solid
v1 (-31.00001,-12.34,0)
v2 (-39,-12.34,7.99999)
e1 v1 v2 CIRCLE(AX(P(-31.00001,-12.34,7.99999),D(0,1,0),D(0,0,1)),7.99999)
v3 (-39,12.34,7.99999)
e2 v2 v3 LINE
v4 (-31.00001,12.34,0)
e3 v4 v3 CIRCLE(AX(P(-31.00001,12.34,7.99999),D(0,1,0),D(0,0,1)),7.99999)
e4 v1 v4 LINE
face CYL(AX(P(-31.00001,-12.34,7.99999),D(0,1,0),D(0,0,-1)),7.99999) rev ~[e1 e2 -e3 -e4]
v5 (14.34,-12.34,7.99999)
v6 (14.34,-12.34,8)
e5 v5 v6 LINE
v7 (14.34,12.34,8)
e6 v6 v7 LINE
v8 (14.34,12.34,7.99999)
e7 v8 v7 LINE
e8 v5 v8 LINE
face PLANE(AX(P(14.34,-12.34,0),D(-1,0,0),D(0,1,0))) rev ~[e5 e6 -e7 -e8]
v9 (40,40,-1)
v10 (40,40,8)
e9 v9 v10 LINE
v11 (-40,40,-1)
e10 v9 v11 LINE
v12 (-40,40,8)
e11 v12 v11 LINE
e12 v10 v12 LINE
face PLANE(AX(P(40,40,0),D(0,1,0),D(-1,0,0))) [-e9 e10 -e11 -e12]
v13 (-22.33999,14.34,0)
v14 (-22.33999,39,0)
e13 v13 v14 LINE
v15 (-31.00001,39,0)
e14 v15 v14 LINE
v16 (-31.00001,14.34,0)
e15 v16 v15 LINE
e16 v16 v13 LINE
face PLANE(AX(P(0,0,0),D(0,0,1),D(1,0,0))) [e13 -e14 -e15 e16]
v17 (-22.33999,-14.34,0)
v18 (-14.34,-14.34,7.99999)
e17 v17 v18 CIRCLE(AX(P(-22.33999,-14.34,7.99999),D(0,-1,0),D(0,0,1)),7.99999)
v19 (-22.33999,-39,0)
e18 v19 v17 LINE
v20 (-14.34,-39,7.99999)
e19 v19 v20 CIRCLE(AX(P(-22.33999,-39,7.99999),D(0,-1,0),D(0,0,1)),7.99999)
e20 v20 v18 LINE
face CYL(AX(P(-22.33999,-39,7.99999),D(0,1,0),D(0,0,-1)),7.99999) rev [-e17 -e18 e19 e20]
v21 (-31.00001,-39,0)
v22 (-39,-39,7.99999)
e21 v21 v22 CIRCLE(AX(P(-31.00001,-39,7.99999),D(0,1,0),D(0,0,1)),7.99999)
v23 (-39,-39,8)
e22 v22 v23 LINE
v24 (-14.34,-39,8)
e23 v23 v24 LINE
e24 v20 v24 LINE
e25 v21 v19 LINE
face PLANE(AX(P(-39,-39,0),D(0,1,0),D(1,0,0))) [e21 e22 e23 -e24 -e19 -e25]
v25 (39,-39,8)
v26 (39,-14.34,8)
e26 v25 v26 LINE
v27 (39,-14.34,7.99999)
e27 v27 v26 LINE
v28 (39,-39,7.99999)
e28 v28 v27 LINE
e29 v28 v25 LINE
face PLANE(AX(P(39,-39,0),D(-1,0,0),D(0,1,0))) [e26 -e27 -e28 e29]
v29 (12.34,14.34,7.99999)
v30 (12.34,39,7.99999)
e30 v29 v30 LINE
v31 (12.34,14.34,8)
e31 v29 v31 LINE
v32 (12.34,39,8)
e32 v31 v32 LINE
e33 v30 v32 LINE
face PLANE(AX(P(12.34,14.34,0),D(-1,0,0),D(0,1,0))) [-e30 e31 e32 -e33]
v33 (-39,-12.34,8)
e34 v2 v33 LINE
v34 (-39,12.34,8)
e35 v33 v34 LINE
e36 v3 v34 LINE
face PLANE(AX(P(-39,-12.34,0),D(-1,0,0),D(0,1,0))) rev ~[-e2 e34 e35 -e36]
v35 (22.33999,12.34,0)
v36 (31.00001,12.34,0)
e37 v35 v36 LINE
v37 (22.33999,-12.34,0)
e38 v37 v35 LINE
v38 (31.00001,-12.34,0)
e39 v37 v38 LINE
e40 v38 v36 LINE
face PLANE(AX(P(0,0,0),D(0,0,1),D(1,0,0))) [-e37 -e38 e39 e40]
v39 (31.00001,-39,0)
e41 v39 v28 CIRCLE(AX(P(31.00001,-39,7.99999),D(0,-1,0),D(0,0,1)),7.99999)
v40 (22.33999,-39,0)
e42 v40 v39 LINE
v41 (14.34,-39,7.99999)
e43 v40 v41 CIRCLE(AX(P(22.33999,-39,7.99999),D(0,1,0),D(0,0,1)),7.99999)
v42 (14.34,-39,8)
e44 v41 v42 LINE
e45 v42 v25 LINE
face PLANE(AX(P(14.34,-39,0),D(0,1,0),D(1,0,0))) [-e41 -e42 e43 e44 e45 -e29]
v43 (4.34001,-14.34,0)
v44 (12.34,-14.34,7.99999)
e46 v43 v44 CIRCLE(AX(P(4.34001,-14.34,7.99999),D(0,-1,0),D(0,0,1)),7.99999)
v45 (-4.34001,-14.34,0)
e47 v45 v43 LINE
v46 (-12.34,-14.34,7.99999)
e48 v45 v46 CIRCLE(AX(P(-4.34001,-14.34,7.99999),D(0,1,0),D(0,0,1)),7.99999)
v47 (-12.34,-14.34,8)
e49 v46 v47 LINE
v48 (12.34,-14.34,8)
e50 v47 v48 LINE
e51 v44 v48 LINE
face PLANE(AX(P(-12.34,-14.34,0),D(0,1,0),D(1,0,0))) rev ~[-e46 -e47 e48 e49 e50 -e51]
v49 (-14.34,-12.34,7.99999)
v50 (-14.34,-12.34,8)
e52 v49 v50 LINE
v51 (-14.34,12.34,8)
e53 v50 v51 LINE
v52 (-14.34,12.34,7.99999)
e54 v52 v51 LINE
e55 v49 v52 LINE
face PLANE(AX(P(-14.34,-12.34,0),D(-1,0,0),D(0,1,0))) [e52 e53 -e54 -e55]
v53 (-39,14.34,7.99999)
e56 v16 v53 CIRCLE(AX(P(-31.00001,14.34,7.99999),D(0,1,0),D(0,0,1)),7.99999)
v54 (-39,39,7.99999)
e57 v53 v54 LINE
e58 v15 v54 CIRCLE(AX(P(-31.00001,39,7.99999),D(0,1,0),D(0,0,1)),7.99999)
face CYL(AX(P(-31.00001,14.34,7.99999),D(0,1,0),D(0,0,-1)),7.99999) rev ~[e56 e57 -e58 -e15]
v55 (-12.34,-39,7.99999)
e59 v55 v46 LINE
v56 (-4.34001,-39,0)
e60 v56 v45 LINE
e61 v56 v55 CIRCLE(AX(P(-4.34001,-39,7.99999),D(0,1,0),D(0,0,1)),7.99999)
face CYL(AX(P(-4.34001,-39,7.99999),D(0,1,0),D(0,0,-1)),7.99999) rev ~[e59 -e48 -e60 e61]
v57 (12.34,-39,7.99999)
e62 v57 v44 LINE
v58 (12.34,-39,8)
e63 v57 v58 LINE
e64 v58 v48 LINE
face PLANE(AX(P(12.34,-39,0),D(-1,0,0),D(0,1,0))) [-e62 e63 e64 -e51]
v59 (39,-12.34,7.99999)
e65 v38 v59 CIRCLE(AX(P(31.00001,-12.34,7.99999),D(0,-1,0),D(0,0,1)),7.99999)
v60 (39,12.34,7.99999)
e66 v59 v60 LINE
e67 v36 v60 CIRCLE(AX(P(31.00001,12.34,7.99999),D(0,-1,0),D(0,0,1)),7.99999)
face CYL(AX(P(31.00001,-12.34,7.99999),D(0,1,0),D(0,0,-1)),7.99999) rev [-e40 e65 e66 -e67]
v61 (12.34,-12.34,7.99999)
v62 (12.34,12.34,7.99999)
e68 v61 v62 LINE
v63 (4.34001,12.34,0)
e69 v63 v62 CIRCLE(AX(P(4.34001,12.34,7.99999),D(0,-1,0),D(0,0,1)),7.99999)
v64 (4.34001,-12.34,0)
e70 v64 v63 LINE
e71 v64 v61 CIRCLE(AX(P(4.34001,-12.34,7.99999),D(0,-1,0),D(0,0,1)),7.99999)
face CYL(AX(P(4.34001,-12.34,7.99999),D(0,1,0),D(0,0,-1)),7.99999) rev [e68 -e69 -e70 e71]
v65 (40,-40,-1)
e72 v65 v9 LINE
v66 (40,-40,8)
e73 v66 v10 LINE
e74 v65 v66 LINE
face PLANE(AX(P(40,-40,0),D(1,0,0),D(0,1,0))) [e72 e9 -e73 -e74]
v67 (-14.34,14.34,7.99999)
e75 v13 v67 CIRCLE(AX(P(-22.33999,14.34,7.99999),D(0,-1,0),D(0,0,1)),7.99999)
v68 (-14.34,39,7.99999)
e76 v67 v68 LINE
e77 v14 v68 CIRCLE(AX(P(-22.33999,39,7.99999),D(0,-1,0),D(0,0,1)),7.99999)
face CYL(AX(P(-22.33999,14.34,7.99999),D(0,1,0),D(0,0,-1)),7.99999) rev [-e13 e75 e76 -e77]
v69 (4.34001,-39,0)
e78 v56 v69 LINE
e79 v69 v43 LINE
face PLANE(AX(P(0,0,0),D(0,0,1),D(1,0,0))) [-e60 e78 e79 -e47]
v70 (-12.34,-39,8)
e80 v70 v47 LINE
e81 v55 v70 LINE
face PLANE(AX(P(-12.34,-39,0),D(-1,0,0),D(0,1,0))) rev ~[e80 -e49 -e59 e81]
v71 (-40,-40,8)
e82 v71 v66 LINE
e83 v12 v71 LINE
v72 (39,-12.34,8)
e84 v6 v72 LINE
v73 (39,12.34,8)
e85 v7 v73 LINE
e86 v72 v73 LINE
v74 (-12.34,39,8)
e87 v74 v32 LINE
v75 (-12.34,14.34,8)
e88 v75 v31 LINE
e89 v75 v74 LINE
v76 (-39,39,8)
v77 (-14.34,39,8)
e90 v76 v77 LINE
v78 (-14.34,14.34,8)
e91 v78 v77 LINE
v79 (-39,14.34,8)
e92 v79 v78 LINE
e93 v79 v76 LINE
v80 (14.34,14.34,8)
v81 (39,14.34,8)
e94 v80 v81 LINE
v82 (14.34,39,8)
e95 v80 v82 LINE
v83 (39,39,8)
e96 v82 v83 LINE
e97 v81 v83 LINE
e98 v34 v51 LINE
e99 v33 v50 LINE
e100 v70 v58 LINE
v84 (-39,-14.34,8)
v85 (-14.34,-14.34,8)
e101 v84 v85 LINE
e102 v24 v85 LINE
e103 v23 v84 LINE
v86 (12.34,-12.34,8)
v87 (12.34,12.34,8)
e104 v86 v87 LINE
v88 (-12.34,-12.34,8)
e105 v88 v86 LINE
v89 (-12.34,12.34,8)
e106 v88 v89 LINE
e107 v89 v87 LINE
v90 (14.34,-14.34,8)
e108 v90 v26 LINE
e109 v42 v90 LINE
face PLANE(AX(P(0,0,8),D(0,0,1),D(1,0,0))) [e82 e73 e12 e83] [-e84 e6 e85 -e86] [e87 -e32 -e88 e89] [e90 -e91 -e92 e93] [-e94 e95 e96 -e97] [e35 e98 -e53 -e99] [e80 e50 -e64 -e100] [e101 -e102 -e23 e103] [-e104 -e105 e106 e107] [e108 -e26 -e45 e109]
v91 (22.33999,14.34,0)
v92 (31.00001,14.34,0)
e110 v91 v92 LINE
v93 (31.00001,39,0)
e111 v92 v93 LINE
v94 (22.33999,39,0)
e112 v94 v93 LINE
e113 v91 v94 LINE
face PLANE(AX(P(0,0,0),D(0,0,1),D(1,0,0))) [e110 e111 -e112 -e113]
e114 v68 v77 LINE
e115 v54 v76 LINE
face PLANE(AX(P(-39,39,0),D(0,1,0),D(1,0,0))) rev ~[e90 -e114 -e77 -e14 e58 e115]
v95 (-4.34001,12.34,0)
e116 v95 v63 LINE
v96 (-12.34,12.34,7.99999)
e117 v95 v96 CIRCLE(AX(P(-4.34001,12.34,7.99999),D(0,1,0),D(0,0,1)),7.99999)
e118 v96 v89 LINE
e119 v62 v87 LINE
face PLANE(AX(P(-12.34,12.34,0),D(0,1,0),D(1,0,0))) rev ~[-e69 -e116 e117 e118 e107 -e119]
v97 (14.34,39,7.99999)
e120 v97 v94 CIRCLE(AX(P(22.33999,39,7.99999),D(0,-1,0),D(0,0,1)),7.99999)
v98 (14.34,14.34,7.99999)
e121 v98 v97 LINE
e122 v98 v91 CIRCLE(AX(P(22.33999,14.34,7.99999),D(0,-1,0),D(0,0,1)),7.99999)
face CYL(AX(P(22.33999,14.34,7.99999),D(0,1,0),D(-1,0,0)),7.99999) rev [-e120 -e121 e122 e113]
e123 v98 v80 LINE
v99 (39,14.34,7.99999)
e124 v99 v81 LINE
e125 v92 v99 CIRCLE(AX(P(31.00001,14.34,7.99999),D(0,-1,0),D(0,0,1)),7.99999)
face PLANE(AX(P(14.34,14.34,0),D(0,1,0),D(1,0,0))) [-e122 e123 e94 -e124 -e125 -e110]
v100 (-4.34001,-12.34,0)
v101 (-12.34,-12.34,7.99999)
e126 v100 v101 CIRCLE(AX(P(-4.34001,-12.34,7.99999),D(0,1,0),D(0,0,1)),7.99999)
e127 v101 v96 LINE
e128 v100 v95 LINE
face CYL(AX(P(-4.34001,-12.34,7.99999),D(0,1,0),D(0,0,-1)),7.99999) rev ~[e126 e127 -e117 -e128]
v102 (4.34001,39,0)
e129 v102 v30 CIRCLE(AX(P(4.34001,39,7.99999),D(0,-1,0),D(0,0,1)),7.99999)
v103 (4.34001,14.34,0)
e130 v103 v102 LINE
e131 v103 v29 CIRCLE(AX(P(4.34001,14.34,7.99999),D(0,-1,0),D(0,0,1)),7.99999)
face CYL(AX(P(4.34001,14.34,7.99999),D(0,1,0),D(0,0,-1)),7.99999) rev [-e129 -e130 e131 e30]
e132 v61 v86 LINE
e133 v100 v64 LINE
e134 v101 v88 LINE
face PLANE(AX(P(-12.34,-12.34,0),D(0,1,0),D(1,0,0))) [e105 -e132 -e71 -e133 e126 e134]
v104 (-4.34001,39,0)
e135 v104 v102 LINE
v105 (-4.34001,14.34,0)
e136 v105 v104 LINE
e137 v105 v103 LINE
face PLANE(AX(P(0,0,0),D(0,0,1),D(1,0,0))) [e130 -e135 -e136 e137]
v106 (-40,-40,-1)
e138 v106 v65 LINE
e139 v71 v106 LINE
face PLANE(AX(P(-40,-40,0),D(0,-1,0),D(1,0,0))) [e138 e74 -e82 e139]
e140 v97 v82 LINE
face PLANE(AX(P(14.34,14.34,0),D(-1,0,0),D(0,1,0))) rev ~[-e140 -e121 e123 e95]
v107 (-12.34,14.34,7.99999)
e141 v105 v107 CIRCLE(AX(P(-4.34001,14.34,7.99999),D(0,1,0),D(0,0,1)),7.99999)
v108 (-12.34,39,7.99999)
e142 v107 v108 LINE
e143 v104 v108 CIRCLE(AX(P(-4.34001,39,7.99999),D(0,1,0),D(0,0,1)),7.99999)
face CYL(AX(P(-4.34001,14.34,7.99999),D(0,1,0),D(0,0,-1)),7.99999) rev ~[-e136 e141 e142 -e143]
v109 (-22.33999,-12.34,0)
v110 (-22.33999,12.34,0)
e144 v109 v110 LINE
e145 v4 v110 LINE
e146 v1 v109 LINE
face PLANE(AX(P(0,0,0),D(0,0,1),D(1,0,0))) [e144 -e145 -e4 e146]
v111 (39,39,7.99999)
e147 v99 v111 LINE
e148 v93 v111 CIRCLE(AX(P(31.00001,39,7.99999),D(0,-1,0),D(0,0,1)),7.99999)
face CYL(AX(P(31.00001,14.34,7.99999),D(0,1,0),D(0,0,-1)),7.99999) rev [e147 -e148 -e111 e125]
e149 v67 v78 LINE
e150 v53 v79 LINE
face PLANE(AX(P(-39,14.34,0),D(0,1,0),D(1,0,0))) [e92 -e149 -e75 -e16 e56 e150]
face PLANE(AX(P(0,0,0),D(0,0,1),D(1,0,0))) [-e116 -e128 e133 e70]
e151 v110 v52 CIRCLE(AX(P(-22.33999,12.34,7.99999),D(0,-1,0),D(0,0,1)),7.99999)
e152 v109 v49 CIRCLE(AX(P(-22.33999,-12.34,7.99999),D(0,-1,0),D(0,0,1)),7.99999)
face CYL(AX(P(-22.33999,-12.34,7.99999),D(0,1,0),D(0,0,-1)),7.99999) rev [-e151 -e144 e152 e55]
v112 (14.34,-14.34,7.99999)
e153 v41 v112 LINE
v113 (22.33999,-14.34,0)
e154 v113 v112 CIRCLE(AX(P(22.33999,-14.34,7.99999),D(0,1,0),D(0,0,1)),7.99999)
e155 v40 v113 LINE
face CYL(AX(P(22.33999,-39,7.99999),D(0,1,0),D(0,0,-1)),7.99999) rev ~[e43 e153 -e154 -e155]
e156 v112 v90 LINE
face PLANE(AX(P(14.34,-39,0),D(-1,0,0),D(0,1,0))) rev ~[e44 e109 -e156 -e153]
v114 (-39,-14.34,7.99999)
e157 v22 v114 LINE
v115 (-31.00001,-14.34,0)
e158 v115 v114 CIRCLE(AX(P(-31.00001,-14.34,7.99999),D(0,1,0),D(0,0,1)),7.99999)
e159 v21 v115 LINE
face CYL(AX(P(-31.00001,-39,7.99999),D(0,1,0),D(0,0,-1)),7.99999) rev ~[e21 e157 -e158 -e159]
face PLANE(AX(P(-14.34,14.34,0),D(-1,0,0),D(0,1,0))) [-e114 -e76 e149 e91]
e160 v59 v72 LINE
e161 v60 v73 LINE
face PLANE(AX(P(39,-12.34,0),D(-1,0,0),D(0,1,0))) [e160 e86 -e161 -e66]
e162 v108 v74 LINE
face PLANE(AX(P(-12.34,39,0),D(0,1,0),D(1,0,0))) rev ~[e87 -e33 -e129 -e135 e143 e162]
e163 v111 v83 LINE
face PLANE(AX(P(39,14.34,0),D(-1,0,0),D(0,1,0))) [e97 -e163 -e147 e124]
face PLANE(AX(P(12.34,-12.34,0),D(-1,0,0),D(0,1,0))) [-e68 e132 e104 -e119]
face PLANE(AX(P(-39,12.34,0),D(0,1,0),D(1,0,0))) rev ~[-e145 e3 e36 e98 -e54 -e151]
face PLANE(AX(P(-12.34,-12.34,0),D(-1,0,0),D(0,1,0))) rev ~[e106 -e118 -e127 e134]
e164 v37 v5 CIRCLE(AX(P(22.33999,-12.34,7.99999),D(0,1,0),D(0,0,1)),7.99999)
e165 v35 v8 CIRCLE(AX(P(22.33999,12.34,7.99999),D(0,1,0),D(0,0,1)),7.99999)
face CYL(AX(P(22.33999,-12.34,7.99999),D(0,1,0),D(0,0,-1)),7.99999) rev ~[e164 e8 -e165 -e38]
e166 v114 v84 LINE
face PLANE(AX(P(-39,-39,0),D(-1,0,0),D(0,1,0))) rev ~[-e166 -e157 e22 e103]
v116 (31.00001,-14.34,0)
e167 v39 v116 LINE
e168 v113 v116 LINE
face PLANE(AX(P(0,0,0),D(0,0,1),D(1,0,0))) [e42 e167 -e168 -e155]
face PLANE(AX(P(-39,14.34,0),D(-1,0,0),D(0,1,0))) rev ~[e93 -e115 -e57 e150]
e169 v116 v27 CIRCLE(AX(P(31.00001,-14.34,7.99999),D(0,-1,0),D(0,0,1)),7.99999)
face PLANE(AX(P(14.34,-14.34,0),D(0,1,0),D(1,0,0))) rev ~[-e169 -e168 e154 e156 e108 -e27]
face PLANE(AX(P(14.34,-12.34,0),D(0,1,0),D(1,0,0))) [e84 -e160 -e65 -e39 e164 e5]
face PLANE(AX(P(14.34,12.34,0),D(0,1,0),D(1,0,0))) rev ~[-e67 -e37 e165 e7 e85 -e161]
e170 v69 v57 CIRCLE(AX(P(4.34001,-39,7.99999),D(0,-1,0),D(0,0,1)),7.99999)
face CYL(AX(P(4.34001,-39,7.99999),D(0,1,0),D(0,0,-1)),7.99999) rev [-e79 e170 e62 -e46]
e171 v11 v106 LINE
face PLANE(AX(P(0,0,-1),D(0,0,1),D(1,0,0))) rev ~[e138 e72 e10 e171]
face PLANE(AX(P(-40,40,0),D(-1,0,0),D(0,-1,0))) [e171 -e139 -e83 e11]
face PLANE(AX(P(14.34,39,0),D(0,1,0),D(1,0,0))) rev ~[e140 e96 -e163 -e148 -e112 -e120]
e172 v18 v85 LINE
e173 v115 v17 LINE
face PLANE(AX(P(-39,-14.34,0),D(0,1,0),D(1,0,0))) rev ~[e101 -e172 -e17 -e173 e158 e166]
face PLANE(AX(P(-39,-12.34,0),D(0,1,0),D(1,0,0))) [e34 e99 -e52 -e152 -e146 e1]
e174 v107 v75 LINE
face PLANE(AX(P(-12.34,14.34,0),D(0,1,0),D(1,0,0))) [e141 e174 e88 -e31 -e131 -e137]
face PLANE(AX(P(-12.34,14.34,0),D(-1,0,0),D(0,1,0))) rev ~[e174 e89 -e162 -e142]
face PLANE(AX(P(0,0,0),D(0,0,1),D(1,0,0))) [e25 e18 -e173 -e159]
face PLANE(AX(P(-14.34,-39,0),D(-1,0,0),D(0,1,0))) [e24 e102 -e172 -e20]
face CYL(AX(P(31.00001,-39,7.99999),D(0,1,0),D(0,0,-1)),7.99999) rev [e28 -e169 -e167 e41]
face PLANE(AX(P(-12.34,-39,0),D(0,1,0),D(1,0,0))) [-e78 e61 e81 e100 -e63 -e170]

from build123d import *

# Parameters (mm, degrees)
F0_W     = 24.66
F0_H     = 24.66
F0_W_2   = 24.68
F0_H_2   = 24.68
F1_DEPTH = 8
F2_DEPTH = 1
F3_R     = 7.99999


# Not quite as in the source:
# - a fillet or chamfer is up to 0.001 mm smaller than in the source, because OpenCascade refuses the exact size


with BuildPart() as f1:
    # F0 (on Top) → F1 (new body)
    with BuildSketch(Plane.XY):
        Polygon((-40, -40), (40, -40), (40, 40), (-40, 40), (-40, -13.34), align=None)
        with Locations((-26.67, -26.67)):
            Rectangle(F0_W, F0_H, mode=Mode.SUBTRACT)
        with Locations((0, -26.67)):
            Rectangle(F0_W_2, F0_H, mode=Mode.SUBTRACT)
        with Locations((26.67, -26.67)):
            Rectangle(F0_W, F0_H, mode=Mode.SUBTRACT)
        with Locations((-26.67, 0)):
            Rectangle(F0_W, F0_H_2, mode=Mode.SUBTRACT)
        with Locations((-26.67, 26.67)):
            Rectangle(F0_W, F0_H, mode=Mode.SUBTRACT)
        Rectangle(F0_W_2, F0_H_2, mode=Mode.SUBTRACT)
        with Locations((26.67, 0)):
            Rectangle(F0_W, F0_H_2, mode=Mode.SUBTRACT)
        with Locations((0, 26.67)):
            Rectangle(F0_W_2, F0_H, mode=Mode.SUBTRACT)
        with Locations((26.67, 26.67)):
            Rectangle(F0_W, F0_H, mode=Mode.SUBTRACT)
    extrude(amount=F1_DEPTH)

    # F0 (on Top) → F2 (join)
    with BuildSketch(Plane.XY):
        Polygon((-40, -40), (40, -40), (40, 40), (-40, 40), (-40, -13.34), align=None)
        with Locations((-26.67, -26.67)):
            Rectangle(F0_W, F0_H, mode=Mode.SUBTRACT)
        with Locations((0, -26.67)):
            Rectangle(F0_W_2, F0_H, mode=Mode.SUBTRACT)
        with Locations((26.67, -26.67)):
            Rectangle(F0_W, F0_H, mode=Mode.SUBTRACT)
        with Locations((-26.67, 0)):
            Rectangle(F0_W, F0_H_2, mode=Mode.SUBTRACT)
        with Locations((-26.67, 26.67)):
            Rectangle(F0_W, F0_H, mode=Mode.SUBTRACT)
        Rectangle(F0_W_2, F0_H_2, mode=Mode.SUBTRACT)
        with Locations((26.67, 0)):
            Rectangle(F0_W, F0_H_2, mode=Mode.SUBTRACT)
        with Locations((0, 26.67)):
            Rectangle(F0_W_2, F0_H, mode=Mode.SUBTRACT)
        with Locations((26.67, 26.67)):
            Rectangle(F0_W, F0_H, mode=Mode.SUBTRACT)
        Rectangle(F0_W_2, F0_H_2)
        with Locations((-26.67, 0)):
            Rectangle(F0_W, F0_H_2)
        with Locations((0, -26.67)):
            Rectangle(F0_W_2, F0_H)
        with Locations((26.67, 0)):
            Rectangle(F0_W, F0_H_2)
        with Locations((0, 26.67)):
            Rectangle(F0_W_2, F0_H)
        with Locations((-26.67, -26.67)):
            Rectangle(F0_W, F0_H)
        with Locations((-26.67, 26.67)):
            Rectangle(F0_W, F0_H)
        with Locations((26.67, -26.67)):
            Rectangle(F0_W, F0_H)
        with Locations((26.67, 26.67)):
            Rectangle(F0_W, F0_H)
    extrude(amount=-F2_DEPTH)

    # F3 (radius 8 in the source; OpenCascade refuses exactly that, so slightly less here)
    f3_edges = [f1.edges().sort_by_distance(p)[0] for p in [
        (14.34, -26.67, 0),
        (14.34, 0, 0),
        (14.34, 26.67, 0),
        (-12.34, 26.67, 0),
        (-12.34, 0, 0),
        (-12.34, -26.67, 0),
        (-39, -26.67, 0),
        (-39, 0, 0),
        (-39, 26.67, 0),
        (12.34, -26.67, 0),
        (12.34, 0, 0),
        (12.34, 26.67, 0),
        (-14.34, 26.67, 0),
        (-14.34, 0, 0),
        (-14.34, -26.67, 0),
        (39, 26.67, 0),
        (39, 0, 0),
        (39, -26.67, 0),
    ]]
    fillet(f3_edges, radius=F3_R)


solid = f1.part
